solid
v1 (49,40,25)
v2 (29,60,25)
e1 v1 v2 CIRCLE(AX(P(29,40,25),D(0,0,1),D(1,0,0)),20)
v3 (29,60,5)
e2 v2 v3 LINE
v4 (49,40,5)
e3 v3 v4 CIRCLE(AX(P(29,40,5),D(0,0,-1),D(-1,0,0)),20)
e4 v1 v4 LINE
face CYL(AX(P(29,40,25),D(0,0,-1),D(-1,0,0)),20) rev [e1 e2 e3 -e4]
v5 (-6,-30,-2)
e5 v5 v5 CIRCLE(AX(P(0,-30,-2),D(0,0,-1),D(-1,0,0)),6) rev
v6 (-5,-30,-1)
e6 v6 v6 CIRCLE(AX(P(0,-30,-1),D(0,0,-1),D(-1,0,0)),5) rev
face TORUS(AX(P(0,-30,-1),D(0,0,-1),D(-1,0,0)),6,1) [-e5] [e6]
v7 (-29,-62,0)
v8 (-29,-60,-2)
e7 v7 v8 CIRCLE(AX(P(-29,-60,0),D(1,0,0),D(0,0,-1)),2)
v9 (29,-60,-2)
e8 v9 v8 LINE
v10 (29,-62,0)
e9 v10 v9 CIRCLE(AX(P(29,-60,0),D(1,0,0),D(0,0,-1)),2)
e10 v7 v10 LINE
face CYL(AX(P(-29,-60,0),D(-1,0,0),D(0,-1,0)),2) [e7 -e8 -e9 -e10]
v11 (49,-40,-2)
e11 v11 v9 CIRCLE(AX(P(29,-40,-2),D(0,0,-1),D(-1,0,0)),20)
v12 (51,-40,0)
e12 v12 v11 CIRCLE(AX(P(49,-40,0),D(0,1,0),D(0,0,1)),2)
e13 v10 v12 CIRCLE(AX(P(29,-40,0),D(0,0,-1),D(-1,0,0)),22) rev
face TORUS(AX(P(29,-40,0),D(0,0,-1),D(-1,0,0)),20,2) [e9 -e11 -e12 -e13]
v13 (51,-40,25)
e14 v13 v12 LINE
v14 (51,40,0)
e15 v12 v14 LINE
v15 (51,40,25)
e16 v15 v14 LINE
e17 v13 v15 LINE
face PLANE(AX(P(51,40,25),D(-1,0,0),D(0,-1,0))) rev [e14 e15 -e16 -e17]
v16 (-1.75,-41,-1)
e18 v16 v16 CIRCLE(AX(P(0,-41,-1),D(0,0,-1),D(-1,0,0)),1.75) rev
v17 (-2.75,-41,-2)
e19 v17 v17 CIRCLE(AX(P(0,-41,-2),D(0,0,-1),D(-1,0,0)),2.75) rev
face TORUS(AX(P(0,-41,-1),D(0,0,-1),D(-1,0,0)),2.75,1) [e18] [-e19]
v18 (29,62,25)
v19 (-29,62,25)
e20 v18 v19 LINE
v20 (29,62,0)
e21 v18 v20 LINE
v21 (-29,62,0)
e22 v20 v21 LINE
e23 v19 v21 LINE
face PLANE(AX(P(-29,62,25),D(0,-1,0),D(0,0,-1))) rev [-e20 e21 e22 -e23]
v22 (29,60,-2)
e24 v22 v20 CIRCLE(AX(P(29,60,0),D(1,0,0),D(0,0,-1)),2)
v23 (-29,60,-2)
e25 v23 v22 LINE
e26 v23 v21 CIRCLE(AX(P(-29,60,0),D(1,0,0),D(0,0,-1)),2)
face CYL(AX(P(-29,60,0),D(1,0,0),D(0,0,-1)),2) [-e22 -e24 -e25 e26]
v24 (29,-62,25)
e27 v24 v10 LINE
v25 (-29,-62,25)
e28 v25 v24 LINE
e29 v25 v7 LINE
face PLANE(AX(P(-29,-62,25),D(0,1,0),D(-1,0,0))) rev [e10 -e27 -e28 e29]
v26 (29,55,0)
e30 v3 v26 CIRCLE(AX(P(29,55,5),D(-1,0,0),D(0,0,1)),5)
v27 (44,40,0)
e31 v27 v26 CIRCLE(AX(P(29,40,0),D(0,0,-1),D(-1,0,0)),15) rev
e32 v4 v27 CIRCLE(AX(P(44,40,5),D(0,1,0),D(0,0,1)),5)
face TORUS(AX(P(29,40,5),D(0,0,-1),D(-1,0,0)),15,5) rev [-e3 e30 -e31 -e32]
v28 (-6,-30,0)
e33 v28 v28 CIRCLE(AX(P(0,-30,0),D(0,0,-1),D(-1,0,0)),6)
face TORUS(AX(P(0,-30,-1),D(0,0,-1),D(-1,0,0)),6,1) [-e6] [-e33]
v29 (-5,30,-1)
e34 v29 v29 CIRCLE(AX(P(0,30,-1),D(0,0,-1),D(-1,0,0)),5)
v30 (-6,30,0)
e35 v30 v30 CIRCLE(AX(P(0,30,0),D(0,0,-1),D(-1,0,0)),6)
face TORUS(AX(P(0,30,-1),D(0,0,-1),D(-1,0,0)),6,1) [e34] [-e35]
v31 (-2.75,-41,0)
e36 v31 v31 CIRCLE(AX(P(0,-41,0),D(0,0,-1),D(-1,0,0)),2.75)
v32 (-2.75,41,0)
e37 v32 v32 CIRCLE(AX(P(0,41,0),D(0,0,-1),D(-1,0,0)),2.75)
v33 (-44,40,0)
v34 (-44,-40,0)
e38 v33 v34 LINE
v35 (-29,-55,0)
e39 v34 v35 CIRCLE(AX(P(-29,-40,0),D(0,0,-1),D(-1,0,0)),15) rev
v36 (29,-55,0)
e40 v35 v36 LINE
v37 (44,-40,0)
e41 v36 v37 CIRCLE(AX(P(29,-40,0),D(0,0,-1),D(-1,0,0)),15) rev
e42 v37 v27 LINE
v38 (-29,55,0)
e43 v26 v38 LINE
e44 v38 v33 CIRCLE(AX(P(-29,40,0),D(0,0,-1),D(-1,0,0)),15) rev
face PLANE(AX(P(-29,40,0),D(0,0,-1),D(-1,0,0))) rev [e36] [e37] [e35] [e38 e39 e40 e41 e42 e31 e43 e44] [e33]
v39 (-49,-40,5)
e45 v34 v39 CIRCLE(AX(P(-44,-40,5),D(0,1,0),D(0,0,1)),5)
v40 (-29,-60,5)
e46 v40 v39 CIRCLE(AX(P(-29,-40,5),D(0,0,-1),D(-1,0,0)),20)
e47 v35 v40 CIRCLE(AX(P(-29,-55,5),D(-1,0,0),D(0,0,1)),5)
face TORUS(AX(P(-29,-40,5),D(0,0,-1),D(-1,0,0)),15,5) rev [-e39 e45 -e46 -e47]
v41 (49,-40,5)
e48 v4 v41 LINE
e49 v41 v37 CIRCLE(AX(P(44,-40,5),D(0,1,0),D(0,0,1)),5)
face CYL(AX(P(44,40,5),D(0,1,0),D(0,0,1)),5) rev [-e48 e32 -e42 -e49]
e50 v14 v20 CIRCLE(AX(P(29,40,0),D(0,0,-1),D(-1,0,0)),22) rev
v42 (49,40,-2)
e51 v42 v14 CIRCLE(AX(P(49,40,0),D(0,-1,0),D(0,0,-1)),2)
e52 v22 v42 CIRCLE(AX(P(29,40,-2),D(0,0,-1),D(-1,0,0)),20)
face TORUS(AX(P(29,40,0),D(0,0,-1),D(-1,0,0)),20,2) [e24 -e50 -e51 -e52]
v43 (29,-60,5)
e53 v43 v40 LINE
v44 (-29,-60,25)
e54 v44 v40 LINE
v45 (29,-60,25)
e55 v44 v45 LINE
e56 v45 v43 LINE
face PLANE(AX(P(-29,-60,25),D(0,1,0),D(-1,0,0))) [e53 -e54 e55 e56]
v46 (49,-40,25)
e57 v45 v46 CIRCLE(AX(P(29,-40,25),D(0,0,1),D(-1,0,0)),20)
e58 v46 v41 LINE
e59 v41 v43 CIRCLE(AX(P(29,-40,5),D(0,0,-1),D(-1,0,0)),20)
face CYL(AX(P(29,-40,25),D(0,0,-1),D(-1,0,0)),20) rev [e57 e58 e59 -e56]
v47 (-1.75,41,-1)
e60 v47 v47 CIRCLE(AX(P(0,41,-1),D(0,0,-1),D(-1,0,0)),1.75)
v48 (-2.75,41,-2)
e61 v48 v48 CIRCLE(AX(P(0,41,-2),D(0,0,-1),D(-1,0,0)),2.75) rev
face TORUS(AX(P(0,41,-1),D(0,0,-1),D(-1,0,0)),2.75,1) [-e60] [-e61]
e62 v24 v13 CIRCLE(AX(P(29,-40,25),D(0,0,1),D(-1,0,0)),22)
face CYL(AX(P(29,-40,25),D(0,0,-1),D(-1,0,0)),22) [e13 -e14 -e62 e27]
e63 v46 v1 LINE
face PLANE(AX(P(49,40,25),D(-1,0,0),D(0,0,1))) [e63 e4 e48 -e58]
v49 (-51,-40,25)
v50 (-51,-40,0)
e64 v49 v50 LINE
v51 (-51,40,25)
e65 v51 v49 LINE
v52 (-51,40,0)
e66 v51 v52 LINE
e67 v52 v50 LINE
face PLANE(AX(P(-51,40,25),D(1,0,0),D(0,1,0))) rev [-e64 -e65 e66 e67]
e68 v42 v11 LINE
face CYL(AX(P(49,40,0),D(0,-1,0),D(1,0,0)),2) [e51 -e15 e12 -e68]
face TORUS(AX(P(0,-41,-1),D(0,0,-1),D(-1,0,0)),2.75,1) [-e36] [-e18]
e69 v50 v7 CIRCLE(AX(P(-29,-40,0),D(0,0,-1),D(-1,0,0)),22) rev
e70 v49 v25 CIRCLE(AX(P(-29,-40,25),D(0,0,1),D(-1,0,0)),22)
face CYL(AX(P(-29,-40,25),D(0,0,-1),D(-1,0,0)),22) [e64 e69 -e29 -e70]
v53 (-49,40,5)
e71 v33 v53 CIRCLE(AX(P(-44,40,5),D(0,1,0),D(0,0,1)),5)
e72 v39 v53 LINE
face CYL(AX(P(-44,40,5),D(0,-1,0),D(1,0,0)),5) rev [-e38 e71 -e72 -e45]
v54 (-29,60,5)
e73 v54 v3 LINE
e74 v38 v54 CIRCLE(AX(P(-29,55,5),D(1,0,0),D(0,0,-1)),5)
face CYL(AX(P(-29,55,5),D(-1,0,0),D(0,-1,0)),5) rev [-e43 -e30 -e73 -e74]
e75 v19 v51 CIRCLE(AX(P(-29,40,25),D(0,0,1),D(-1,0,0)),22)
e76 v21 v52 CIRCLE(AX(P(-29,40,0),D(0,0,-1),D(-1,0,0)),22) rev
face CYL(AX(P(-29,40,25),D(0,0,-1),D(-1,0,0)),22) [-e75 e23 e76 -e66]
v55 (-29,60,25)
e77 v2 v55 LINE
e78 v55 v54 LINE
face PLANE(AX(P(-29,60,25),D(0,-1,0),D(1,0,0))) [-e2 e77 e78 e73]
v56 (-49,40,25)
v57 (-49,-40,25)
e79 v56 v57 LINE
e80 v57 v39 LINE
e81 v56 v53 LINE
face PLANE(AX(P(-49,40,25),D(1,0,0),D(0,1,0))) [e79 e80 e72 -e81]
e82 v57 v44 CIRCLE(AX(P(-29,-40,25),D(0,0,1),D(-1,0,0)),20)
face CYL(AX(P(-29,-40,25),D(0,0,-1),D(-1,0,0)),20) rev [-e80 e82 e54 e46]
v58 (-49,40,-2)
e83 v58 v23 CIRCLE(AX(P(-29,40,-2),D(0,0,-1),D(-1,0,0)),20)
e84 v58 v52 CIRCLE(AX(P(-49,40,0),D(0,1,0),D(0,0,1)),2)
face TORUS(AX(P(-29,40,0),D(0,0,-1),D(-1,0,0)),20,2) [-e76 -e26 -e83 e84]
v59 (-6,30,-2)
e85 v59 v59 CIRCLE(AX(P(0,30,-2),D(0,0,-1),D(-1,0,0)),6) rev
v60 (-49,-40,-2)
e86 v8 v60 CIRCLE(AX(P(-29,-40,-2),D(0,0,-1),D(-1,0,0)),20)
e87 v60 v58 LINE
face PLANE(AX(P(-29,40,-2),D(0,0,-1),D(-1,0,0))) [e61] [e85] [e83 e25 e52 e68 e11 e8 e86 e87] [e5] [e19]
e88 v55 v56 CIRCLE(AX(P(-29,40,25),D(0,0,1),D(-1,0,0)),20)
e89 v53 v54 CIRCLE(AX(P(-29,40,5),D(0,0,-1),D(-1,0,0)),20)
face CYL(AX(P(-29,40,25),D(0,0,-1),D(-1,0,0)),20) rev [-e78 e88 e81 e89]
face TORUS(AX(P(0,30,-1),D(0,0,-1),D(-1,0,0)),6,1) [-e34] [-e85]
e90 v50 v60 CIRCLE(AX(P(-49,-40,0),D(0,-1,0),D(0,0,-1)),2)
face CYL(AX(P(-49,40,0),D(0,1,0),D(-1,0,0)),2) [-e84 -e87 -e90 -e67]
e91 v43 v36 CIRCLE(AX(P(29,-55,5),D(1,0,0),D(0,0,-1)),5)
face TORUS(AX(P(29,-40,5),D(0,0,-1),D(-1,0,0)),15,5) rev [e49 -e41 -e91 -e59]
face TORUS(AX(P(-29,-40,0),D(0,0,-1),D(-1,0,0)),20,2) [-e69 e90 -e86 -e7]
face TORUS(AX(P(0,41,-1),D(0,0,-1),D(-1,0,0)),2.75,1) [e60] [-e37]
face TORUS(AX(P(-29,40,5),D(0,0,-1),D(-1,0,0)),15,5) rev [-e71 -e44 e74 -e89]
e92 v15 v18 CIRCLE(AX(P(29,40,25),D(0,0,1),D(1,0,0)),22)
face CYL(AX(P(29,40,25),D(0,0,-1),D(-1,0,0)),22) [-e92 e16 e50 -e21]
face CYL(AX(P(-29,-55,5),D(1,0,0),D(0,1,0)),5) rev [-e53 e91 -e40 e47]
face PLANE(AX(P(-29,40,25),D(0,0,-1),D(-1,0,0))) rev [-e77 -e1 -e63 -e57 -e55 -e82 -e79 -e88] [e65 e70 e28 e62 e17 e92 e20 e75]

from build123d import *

# Parameters (mm, degrees)
BOSS_EXTRUDE7_DEPTH = 25
BOSS_EXTRUDE9_START = -2
SKETCH6_R           = 1.75
SKETCH6_R_2         = 5
BOSS_EXTRUDE9_DEPTH = 2
FILLET1_R           = 5
FILLET2_R           = 2
FILLET3_R           = 1


with BuildPart() as part:
    # Sketch1 → Boss-Extrude7 (new body)
    with BuildSketch(Plane.XY):
        with BuildLine():
            Line((-29, 62), (29, 62))
            ThreePointArc((29, 62), (44.556349186, 55.556349186), (51, 40))
            Line((51, 40), (51, -40))
            ThreePointArc((51, -40), (44.556349186, -55.556349186), (29, -62))
            Line((29, -62), (-29, -62))
            ThreePointArc((-29, -62), (-44.556349186, -55.556349186), (-51, -40))
            Line((-51, -40), (-51, 40))
            ThreePointArc((-51, 40), (-44.556349186, 55.556349186), (-29, 62))
        make_face()
        with BuildLine():
            Line((-29, 60), (29, 60))
            ThreePointArc((29, 60), (43.142135624, 54.142135624), (49, 40))
            Line((49, 40), (49, -40))
            ThreePointArc((49, -40), (43.142135624, -54.142135624), (29, -60))
            Line((29, -60), (-29, -60))
            ThreePointArc((-29, -60), (-43.142135624, -54.142135624), (-49, -40))
            Line((-49, -40), (-49, 40))
            ThreePointArc((-49, 40), (-43.142135624, 54.142135624), (-29, 60))
        make_face(mode=Mode.SUBTRACT)
    extrude(amount=BOSS_EXTRUDE7_DEPTH)

    # Sketch6 → Boss-Extrude9 (add)
    with BuildSketch(Plane.XY.offset(BOSS_EXTRUDE9_START)):
        with BuildLine():
            Line((-29, 62), (29, 62))
            ThreePointArc((29, 62), (44.556349186, 55.556349186), (51, 40))
            Line((51, 40), (51, -40))
            ThreePointArc((51, -40), (44.556349186, -55.556349186), (29, -62))
            Line((29, -62), (-29, -62))
            ThreePointArc((-29, -62), (-44.556349186, -55.556349186), (-51, -40))
            Line((-51, -40), (-51, 40))
            ThreePointArc((-51, 40), (-44.556349186, 55.556349186), (-29, 62))
        make_face()
        with Locations((0, 41)):
            Circle(SKETCH6_R, mode=Mode.SUBTRACT)
        with Locations((0, -41)):
            Circle(SKETCH6_R, mode=Mode.SUBTRACT)
        with Locations((0, 30)):
            Circle(SKETCH6_R_2, mode=Mode.SUBTRACT)
        with Locations((0, -30)):
            Circle(SKETCH6_R_2, mode=Mode.SUBTRACT)
    extrude(amount=BOSS_EXTRUDE9_DEPTH)

    # Fillet1
    fillet1_edges = [part.edges().sort_by_distance(p)[0] for p in [
        (43.142135624, 54.142135624, 0),
        (0, 60, 0),
        (-43.142135624, 54.142135624, 0),
        (-49, 0, 0),
        (-43.142135624, -54.142135624, 0),
        (0, -60, 0),
        (43.142135624, -54.142135624, 0),
        (49, 0, 0),
    ]]
    fillet(fillet1_edges, radius=FILLET1_R)

    # Fillet2
    fillet2_edges = [part.edges().sort_by_distance(p)[0] for p in [
        (-44.556349186, 55.556349186, -2),
        (0, 62, -2),
        (44.556349186, 55.556349186, -2),
        (51, 0, -2),
        (44.556349186, -55.556349186, -2),
        (0, -62, -2),
        (-44.556349186, -55.556349186, -2),
        (-51, 0, -2),
    ]]
    fillet(fillet2_edges, radius=FILLET2_R)

    # Fillet3
    fillet3_edges = [part.edges().sort_by_distance(p)[0] for p in [
        (-5, -30, -2),
        (-5, 30, -2),
        (-1.75, -41, -2),
        (-1.75, 41, -2),
        (-1.75, 41, 0),
        (-1.75, -41, 0),
        (-5, 30, 0),
        (-5, -30, 0),
    ]]
    fillet(fillet3_edges, radius=FILLET3_R - 0.0001)  # a hair under: the kernel refuses the full size


solid = part.part
